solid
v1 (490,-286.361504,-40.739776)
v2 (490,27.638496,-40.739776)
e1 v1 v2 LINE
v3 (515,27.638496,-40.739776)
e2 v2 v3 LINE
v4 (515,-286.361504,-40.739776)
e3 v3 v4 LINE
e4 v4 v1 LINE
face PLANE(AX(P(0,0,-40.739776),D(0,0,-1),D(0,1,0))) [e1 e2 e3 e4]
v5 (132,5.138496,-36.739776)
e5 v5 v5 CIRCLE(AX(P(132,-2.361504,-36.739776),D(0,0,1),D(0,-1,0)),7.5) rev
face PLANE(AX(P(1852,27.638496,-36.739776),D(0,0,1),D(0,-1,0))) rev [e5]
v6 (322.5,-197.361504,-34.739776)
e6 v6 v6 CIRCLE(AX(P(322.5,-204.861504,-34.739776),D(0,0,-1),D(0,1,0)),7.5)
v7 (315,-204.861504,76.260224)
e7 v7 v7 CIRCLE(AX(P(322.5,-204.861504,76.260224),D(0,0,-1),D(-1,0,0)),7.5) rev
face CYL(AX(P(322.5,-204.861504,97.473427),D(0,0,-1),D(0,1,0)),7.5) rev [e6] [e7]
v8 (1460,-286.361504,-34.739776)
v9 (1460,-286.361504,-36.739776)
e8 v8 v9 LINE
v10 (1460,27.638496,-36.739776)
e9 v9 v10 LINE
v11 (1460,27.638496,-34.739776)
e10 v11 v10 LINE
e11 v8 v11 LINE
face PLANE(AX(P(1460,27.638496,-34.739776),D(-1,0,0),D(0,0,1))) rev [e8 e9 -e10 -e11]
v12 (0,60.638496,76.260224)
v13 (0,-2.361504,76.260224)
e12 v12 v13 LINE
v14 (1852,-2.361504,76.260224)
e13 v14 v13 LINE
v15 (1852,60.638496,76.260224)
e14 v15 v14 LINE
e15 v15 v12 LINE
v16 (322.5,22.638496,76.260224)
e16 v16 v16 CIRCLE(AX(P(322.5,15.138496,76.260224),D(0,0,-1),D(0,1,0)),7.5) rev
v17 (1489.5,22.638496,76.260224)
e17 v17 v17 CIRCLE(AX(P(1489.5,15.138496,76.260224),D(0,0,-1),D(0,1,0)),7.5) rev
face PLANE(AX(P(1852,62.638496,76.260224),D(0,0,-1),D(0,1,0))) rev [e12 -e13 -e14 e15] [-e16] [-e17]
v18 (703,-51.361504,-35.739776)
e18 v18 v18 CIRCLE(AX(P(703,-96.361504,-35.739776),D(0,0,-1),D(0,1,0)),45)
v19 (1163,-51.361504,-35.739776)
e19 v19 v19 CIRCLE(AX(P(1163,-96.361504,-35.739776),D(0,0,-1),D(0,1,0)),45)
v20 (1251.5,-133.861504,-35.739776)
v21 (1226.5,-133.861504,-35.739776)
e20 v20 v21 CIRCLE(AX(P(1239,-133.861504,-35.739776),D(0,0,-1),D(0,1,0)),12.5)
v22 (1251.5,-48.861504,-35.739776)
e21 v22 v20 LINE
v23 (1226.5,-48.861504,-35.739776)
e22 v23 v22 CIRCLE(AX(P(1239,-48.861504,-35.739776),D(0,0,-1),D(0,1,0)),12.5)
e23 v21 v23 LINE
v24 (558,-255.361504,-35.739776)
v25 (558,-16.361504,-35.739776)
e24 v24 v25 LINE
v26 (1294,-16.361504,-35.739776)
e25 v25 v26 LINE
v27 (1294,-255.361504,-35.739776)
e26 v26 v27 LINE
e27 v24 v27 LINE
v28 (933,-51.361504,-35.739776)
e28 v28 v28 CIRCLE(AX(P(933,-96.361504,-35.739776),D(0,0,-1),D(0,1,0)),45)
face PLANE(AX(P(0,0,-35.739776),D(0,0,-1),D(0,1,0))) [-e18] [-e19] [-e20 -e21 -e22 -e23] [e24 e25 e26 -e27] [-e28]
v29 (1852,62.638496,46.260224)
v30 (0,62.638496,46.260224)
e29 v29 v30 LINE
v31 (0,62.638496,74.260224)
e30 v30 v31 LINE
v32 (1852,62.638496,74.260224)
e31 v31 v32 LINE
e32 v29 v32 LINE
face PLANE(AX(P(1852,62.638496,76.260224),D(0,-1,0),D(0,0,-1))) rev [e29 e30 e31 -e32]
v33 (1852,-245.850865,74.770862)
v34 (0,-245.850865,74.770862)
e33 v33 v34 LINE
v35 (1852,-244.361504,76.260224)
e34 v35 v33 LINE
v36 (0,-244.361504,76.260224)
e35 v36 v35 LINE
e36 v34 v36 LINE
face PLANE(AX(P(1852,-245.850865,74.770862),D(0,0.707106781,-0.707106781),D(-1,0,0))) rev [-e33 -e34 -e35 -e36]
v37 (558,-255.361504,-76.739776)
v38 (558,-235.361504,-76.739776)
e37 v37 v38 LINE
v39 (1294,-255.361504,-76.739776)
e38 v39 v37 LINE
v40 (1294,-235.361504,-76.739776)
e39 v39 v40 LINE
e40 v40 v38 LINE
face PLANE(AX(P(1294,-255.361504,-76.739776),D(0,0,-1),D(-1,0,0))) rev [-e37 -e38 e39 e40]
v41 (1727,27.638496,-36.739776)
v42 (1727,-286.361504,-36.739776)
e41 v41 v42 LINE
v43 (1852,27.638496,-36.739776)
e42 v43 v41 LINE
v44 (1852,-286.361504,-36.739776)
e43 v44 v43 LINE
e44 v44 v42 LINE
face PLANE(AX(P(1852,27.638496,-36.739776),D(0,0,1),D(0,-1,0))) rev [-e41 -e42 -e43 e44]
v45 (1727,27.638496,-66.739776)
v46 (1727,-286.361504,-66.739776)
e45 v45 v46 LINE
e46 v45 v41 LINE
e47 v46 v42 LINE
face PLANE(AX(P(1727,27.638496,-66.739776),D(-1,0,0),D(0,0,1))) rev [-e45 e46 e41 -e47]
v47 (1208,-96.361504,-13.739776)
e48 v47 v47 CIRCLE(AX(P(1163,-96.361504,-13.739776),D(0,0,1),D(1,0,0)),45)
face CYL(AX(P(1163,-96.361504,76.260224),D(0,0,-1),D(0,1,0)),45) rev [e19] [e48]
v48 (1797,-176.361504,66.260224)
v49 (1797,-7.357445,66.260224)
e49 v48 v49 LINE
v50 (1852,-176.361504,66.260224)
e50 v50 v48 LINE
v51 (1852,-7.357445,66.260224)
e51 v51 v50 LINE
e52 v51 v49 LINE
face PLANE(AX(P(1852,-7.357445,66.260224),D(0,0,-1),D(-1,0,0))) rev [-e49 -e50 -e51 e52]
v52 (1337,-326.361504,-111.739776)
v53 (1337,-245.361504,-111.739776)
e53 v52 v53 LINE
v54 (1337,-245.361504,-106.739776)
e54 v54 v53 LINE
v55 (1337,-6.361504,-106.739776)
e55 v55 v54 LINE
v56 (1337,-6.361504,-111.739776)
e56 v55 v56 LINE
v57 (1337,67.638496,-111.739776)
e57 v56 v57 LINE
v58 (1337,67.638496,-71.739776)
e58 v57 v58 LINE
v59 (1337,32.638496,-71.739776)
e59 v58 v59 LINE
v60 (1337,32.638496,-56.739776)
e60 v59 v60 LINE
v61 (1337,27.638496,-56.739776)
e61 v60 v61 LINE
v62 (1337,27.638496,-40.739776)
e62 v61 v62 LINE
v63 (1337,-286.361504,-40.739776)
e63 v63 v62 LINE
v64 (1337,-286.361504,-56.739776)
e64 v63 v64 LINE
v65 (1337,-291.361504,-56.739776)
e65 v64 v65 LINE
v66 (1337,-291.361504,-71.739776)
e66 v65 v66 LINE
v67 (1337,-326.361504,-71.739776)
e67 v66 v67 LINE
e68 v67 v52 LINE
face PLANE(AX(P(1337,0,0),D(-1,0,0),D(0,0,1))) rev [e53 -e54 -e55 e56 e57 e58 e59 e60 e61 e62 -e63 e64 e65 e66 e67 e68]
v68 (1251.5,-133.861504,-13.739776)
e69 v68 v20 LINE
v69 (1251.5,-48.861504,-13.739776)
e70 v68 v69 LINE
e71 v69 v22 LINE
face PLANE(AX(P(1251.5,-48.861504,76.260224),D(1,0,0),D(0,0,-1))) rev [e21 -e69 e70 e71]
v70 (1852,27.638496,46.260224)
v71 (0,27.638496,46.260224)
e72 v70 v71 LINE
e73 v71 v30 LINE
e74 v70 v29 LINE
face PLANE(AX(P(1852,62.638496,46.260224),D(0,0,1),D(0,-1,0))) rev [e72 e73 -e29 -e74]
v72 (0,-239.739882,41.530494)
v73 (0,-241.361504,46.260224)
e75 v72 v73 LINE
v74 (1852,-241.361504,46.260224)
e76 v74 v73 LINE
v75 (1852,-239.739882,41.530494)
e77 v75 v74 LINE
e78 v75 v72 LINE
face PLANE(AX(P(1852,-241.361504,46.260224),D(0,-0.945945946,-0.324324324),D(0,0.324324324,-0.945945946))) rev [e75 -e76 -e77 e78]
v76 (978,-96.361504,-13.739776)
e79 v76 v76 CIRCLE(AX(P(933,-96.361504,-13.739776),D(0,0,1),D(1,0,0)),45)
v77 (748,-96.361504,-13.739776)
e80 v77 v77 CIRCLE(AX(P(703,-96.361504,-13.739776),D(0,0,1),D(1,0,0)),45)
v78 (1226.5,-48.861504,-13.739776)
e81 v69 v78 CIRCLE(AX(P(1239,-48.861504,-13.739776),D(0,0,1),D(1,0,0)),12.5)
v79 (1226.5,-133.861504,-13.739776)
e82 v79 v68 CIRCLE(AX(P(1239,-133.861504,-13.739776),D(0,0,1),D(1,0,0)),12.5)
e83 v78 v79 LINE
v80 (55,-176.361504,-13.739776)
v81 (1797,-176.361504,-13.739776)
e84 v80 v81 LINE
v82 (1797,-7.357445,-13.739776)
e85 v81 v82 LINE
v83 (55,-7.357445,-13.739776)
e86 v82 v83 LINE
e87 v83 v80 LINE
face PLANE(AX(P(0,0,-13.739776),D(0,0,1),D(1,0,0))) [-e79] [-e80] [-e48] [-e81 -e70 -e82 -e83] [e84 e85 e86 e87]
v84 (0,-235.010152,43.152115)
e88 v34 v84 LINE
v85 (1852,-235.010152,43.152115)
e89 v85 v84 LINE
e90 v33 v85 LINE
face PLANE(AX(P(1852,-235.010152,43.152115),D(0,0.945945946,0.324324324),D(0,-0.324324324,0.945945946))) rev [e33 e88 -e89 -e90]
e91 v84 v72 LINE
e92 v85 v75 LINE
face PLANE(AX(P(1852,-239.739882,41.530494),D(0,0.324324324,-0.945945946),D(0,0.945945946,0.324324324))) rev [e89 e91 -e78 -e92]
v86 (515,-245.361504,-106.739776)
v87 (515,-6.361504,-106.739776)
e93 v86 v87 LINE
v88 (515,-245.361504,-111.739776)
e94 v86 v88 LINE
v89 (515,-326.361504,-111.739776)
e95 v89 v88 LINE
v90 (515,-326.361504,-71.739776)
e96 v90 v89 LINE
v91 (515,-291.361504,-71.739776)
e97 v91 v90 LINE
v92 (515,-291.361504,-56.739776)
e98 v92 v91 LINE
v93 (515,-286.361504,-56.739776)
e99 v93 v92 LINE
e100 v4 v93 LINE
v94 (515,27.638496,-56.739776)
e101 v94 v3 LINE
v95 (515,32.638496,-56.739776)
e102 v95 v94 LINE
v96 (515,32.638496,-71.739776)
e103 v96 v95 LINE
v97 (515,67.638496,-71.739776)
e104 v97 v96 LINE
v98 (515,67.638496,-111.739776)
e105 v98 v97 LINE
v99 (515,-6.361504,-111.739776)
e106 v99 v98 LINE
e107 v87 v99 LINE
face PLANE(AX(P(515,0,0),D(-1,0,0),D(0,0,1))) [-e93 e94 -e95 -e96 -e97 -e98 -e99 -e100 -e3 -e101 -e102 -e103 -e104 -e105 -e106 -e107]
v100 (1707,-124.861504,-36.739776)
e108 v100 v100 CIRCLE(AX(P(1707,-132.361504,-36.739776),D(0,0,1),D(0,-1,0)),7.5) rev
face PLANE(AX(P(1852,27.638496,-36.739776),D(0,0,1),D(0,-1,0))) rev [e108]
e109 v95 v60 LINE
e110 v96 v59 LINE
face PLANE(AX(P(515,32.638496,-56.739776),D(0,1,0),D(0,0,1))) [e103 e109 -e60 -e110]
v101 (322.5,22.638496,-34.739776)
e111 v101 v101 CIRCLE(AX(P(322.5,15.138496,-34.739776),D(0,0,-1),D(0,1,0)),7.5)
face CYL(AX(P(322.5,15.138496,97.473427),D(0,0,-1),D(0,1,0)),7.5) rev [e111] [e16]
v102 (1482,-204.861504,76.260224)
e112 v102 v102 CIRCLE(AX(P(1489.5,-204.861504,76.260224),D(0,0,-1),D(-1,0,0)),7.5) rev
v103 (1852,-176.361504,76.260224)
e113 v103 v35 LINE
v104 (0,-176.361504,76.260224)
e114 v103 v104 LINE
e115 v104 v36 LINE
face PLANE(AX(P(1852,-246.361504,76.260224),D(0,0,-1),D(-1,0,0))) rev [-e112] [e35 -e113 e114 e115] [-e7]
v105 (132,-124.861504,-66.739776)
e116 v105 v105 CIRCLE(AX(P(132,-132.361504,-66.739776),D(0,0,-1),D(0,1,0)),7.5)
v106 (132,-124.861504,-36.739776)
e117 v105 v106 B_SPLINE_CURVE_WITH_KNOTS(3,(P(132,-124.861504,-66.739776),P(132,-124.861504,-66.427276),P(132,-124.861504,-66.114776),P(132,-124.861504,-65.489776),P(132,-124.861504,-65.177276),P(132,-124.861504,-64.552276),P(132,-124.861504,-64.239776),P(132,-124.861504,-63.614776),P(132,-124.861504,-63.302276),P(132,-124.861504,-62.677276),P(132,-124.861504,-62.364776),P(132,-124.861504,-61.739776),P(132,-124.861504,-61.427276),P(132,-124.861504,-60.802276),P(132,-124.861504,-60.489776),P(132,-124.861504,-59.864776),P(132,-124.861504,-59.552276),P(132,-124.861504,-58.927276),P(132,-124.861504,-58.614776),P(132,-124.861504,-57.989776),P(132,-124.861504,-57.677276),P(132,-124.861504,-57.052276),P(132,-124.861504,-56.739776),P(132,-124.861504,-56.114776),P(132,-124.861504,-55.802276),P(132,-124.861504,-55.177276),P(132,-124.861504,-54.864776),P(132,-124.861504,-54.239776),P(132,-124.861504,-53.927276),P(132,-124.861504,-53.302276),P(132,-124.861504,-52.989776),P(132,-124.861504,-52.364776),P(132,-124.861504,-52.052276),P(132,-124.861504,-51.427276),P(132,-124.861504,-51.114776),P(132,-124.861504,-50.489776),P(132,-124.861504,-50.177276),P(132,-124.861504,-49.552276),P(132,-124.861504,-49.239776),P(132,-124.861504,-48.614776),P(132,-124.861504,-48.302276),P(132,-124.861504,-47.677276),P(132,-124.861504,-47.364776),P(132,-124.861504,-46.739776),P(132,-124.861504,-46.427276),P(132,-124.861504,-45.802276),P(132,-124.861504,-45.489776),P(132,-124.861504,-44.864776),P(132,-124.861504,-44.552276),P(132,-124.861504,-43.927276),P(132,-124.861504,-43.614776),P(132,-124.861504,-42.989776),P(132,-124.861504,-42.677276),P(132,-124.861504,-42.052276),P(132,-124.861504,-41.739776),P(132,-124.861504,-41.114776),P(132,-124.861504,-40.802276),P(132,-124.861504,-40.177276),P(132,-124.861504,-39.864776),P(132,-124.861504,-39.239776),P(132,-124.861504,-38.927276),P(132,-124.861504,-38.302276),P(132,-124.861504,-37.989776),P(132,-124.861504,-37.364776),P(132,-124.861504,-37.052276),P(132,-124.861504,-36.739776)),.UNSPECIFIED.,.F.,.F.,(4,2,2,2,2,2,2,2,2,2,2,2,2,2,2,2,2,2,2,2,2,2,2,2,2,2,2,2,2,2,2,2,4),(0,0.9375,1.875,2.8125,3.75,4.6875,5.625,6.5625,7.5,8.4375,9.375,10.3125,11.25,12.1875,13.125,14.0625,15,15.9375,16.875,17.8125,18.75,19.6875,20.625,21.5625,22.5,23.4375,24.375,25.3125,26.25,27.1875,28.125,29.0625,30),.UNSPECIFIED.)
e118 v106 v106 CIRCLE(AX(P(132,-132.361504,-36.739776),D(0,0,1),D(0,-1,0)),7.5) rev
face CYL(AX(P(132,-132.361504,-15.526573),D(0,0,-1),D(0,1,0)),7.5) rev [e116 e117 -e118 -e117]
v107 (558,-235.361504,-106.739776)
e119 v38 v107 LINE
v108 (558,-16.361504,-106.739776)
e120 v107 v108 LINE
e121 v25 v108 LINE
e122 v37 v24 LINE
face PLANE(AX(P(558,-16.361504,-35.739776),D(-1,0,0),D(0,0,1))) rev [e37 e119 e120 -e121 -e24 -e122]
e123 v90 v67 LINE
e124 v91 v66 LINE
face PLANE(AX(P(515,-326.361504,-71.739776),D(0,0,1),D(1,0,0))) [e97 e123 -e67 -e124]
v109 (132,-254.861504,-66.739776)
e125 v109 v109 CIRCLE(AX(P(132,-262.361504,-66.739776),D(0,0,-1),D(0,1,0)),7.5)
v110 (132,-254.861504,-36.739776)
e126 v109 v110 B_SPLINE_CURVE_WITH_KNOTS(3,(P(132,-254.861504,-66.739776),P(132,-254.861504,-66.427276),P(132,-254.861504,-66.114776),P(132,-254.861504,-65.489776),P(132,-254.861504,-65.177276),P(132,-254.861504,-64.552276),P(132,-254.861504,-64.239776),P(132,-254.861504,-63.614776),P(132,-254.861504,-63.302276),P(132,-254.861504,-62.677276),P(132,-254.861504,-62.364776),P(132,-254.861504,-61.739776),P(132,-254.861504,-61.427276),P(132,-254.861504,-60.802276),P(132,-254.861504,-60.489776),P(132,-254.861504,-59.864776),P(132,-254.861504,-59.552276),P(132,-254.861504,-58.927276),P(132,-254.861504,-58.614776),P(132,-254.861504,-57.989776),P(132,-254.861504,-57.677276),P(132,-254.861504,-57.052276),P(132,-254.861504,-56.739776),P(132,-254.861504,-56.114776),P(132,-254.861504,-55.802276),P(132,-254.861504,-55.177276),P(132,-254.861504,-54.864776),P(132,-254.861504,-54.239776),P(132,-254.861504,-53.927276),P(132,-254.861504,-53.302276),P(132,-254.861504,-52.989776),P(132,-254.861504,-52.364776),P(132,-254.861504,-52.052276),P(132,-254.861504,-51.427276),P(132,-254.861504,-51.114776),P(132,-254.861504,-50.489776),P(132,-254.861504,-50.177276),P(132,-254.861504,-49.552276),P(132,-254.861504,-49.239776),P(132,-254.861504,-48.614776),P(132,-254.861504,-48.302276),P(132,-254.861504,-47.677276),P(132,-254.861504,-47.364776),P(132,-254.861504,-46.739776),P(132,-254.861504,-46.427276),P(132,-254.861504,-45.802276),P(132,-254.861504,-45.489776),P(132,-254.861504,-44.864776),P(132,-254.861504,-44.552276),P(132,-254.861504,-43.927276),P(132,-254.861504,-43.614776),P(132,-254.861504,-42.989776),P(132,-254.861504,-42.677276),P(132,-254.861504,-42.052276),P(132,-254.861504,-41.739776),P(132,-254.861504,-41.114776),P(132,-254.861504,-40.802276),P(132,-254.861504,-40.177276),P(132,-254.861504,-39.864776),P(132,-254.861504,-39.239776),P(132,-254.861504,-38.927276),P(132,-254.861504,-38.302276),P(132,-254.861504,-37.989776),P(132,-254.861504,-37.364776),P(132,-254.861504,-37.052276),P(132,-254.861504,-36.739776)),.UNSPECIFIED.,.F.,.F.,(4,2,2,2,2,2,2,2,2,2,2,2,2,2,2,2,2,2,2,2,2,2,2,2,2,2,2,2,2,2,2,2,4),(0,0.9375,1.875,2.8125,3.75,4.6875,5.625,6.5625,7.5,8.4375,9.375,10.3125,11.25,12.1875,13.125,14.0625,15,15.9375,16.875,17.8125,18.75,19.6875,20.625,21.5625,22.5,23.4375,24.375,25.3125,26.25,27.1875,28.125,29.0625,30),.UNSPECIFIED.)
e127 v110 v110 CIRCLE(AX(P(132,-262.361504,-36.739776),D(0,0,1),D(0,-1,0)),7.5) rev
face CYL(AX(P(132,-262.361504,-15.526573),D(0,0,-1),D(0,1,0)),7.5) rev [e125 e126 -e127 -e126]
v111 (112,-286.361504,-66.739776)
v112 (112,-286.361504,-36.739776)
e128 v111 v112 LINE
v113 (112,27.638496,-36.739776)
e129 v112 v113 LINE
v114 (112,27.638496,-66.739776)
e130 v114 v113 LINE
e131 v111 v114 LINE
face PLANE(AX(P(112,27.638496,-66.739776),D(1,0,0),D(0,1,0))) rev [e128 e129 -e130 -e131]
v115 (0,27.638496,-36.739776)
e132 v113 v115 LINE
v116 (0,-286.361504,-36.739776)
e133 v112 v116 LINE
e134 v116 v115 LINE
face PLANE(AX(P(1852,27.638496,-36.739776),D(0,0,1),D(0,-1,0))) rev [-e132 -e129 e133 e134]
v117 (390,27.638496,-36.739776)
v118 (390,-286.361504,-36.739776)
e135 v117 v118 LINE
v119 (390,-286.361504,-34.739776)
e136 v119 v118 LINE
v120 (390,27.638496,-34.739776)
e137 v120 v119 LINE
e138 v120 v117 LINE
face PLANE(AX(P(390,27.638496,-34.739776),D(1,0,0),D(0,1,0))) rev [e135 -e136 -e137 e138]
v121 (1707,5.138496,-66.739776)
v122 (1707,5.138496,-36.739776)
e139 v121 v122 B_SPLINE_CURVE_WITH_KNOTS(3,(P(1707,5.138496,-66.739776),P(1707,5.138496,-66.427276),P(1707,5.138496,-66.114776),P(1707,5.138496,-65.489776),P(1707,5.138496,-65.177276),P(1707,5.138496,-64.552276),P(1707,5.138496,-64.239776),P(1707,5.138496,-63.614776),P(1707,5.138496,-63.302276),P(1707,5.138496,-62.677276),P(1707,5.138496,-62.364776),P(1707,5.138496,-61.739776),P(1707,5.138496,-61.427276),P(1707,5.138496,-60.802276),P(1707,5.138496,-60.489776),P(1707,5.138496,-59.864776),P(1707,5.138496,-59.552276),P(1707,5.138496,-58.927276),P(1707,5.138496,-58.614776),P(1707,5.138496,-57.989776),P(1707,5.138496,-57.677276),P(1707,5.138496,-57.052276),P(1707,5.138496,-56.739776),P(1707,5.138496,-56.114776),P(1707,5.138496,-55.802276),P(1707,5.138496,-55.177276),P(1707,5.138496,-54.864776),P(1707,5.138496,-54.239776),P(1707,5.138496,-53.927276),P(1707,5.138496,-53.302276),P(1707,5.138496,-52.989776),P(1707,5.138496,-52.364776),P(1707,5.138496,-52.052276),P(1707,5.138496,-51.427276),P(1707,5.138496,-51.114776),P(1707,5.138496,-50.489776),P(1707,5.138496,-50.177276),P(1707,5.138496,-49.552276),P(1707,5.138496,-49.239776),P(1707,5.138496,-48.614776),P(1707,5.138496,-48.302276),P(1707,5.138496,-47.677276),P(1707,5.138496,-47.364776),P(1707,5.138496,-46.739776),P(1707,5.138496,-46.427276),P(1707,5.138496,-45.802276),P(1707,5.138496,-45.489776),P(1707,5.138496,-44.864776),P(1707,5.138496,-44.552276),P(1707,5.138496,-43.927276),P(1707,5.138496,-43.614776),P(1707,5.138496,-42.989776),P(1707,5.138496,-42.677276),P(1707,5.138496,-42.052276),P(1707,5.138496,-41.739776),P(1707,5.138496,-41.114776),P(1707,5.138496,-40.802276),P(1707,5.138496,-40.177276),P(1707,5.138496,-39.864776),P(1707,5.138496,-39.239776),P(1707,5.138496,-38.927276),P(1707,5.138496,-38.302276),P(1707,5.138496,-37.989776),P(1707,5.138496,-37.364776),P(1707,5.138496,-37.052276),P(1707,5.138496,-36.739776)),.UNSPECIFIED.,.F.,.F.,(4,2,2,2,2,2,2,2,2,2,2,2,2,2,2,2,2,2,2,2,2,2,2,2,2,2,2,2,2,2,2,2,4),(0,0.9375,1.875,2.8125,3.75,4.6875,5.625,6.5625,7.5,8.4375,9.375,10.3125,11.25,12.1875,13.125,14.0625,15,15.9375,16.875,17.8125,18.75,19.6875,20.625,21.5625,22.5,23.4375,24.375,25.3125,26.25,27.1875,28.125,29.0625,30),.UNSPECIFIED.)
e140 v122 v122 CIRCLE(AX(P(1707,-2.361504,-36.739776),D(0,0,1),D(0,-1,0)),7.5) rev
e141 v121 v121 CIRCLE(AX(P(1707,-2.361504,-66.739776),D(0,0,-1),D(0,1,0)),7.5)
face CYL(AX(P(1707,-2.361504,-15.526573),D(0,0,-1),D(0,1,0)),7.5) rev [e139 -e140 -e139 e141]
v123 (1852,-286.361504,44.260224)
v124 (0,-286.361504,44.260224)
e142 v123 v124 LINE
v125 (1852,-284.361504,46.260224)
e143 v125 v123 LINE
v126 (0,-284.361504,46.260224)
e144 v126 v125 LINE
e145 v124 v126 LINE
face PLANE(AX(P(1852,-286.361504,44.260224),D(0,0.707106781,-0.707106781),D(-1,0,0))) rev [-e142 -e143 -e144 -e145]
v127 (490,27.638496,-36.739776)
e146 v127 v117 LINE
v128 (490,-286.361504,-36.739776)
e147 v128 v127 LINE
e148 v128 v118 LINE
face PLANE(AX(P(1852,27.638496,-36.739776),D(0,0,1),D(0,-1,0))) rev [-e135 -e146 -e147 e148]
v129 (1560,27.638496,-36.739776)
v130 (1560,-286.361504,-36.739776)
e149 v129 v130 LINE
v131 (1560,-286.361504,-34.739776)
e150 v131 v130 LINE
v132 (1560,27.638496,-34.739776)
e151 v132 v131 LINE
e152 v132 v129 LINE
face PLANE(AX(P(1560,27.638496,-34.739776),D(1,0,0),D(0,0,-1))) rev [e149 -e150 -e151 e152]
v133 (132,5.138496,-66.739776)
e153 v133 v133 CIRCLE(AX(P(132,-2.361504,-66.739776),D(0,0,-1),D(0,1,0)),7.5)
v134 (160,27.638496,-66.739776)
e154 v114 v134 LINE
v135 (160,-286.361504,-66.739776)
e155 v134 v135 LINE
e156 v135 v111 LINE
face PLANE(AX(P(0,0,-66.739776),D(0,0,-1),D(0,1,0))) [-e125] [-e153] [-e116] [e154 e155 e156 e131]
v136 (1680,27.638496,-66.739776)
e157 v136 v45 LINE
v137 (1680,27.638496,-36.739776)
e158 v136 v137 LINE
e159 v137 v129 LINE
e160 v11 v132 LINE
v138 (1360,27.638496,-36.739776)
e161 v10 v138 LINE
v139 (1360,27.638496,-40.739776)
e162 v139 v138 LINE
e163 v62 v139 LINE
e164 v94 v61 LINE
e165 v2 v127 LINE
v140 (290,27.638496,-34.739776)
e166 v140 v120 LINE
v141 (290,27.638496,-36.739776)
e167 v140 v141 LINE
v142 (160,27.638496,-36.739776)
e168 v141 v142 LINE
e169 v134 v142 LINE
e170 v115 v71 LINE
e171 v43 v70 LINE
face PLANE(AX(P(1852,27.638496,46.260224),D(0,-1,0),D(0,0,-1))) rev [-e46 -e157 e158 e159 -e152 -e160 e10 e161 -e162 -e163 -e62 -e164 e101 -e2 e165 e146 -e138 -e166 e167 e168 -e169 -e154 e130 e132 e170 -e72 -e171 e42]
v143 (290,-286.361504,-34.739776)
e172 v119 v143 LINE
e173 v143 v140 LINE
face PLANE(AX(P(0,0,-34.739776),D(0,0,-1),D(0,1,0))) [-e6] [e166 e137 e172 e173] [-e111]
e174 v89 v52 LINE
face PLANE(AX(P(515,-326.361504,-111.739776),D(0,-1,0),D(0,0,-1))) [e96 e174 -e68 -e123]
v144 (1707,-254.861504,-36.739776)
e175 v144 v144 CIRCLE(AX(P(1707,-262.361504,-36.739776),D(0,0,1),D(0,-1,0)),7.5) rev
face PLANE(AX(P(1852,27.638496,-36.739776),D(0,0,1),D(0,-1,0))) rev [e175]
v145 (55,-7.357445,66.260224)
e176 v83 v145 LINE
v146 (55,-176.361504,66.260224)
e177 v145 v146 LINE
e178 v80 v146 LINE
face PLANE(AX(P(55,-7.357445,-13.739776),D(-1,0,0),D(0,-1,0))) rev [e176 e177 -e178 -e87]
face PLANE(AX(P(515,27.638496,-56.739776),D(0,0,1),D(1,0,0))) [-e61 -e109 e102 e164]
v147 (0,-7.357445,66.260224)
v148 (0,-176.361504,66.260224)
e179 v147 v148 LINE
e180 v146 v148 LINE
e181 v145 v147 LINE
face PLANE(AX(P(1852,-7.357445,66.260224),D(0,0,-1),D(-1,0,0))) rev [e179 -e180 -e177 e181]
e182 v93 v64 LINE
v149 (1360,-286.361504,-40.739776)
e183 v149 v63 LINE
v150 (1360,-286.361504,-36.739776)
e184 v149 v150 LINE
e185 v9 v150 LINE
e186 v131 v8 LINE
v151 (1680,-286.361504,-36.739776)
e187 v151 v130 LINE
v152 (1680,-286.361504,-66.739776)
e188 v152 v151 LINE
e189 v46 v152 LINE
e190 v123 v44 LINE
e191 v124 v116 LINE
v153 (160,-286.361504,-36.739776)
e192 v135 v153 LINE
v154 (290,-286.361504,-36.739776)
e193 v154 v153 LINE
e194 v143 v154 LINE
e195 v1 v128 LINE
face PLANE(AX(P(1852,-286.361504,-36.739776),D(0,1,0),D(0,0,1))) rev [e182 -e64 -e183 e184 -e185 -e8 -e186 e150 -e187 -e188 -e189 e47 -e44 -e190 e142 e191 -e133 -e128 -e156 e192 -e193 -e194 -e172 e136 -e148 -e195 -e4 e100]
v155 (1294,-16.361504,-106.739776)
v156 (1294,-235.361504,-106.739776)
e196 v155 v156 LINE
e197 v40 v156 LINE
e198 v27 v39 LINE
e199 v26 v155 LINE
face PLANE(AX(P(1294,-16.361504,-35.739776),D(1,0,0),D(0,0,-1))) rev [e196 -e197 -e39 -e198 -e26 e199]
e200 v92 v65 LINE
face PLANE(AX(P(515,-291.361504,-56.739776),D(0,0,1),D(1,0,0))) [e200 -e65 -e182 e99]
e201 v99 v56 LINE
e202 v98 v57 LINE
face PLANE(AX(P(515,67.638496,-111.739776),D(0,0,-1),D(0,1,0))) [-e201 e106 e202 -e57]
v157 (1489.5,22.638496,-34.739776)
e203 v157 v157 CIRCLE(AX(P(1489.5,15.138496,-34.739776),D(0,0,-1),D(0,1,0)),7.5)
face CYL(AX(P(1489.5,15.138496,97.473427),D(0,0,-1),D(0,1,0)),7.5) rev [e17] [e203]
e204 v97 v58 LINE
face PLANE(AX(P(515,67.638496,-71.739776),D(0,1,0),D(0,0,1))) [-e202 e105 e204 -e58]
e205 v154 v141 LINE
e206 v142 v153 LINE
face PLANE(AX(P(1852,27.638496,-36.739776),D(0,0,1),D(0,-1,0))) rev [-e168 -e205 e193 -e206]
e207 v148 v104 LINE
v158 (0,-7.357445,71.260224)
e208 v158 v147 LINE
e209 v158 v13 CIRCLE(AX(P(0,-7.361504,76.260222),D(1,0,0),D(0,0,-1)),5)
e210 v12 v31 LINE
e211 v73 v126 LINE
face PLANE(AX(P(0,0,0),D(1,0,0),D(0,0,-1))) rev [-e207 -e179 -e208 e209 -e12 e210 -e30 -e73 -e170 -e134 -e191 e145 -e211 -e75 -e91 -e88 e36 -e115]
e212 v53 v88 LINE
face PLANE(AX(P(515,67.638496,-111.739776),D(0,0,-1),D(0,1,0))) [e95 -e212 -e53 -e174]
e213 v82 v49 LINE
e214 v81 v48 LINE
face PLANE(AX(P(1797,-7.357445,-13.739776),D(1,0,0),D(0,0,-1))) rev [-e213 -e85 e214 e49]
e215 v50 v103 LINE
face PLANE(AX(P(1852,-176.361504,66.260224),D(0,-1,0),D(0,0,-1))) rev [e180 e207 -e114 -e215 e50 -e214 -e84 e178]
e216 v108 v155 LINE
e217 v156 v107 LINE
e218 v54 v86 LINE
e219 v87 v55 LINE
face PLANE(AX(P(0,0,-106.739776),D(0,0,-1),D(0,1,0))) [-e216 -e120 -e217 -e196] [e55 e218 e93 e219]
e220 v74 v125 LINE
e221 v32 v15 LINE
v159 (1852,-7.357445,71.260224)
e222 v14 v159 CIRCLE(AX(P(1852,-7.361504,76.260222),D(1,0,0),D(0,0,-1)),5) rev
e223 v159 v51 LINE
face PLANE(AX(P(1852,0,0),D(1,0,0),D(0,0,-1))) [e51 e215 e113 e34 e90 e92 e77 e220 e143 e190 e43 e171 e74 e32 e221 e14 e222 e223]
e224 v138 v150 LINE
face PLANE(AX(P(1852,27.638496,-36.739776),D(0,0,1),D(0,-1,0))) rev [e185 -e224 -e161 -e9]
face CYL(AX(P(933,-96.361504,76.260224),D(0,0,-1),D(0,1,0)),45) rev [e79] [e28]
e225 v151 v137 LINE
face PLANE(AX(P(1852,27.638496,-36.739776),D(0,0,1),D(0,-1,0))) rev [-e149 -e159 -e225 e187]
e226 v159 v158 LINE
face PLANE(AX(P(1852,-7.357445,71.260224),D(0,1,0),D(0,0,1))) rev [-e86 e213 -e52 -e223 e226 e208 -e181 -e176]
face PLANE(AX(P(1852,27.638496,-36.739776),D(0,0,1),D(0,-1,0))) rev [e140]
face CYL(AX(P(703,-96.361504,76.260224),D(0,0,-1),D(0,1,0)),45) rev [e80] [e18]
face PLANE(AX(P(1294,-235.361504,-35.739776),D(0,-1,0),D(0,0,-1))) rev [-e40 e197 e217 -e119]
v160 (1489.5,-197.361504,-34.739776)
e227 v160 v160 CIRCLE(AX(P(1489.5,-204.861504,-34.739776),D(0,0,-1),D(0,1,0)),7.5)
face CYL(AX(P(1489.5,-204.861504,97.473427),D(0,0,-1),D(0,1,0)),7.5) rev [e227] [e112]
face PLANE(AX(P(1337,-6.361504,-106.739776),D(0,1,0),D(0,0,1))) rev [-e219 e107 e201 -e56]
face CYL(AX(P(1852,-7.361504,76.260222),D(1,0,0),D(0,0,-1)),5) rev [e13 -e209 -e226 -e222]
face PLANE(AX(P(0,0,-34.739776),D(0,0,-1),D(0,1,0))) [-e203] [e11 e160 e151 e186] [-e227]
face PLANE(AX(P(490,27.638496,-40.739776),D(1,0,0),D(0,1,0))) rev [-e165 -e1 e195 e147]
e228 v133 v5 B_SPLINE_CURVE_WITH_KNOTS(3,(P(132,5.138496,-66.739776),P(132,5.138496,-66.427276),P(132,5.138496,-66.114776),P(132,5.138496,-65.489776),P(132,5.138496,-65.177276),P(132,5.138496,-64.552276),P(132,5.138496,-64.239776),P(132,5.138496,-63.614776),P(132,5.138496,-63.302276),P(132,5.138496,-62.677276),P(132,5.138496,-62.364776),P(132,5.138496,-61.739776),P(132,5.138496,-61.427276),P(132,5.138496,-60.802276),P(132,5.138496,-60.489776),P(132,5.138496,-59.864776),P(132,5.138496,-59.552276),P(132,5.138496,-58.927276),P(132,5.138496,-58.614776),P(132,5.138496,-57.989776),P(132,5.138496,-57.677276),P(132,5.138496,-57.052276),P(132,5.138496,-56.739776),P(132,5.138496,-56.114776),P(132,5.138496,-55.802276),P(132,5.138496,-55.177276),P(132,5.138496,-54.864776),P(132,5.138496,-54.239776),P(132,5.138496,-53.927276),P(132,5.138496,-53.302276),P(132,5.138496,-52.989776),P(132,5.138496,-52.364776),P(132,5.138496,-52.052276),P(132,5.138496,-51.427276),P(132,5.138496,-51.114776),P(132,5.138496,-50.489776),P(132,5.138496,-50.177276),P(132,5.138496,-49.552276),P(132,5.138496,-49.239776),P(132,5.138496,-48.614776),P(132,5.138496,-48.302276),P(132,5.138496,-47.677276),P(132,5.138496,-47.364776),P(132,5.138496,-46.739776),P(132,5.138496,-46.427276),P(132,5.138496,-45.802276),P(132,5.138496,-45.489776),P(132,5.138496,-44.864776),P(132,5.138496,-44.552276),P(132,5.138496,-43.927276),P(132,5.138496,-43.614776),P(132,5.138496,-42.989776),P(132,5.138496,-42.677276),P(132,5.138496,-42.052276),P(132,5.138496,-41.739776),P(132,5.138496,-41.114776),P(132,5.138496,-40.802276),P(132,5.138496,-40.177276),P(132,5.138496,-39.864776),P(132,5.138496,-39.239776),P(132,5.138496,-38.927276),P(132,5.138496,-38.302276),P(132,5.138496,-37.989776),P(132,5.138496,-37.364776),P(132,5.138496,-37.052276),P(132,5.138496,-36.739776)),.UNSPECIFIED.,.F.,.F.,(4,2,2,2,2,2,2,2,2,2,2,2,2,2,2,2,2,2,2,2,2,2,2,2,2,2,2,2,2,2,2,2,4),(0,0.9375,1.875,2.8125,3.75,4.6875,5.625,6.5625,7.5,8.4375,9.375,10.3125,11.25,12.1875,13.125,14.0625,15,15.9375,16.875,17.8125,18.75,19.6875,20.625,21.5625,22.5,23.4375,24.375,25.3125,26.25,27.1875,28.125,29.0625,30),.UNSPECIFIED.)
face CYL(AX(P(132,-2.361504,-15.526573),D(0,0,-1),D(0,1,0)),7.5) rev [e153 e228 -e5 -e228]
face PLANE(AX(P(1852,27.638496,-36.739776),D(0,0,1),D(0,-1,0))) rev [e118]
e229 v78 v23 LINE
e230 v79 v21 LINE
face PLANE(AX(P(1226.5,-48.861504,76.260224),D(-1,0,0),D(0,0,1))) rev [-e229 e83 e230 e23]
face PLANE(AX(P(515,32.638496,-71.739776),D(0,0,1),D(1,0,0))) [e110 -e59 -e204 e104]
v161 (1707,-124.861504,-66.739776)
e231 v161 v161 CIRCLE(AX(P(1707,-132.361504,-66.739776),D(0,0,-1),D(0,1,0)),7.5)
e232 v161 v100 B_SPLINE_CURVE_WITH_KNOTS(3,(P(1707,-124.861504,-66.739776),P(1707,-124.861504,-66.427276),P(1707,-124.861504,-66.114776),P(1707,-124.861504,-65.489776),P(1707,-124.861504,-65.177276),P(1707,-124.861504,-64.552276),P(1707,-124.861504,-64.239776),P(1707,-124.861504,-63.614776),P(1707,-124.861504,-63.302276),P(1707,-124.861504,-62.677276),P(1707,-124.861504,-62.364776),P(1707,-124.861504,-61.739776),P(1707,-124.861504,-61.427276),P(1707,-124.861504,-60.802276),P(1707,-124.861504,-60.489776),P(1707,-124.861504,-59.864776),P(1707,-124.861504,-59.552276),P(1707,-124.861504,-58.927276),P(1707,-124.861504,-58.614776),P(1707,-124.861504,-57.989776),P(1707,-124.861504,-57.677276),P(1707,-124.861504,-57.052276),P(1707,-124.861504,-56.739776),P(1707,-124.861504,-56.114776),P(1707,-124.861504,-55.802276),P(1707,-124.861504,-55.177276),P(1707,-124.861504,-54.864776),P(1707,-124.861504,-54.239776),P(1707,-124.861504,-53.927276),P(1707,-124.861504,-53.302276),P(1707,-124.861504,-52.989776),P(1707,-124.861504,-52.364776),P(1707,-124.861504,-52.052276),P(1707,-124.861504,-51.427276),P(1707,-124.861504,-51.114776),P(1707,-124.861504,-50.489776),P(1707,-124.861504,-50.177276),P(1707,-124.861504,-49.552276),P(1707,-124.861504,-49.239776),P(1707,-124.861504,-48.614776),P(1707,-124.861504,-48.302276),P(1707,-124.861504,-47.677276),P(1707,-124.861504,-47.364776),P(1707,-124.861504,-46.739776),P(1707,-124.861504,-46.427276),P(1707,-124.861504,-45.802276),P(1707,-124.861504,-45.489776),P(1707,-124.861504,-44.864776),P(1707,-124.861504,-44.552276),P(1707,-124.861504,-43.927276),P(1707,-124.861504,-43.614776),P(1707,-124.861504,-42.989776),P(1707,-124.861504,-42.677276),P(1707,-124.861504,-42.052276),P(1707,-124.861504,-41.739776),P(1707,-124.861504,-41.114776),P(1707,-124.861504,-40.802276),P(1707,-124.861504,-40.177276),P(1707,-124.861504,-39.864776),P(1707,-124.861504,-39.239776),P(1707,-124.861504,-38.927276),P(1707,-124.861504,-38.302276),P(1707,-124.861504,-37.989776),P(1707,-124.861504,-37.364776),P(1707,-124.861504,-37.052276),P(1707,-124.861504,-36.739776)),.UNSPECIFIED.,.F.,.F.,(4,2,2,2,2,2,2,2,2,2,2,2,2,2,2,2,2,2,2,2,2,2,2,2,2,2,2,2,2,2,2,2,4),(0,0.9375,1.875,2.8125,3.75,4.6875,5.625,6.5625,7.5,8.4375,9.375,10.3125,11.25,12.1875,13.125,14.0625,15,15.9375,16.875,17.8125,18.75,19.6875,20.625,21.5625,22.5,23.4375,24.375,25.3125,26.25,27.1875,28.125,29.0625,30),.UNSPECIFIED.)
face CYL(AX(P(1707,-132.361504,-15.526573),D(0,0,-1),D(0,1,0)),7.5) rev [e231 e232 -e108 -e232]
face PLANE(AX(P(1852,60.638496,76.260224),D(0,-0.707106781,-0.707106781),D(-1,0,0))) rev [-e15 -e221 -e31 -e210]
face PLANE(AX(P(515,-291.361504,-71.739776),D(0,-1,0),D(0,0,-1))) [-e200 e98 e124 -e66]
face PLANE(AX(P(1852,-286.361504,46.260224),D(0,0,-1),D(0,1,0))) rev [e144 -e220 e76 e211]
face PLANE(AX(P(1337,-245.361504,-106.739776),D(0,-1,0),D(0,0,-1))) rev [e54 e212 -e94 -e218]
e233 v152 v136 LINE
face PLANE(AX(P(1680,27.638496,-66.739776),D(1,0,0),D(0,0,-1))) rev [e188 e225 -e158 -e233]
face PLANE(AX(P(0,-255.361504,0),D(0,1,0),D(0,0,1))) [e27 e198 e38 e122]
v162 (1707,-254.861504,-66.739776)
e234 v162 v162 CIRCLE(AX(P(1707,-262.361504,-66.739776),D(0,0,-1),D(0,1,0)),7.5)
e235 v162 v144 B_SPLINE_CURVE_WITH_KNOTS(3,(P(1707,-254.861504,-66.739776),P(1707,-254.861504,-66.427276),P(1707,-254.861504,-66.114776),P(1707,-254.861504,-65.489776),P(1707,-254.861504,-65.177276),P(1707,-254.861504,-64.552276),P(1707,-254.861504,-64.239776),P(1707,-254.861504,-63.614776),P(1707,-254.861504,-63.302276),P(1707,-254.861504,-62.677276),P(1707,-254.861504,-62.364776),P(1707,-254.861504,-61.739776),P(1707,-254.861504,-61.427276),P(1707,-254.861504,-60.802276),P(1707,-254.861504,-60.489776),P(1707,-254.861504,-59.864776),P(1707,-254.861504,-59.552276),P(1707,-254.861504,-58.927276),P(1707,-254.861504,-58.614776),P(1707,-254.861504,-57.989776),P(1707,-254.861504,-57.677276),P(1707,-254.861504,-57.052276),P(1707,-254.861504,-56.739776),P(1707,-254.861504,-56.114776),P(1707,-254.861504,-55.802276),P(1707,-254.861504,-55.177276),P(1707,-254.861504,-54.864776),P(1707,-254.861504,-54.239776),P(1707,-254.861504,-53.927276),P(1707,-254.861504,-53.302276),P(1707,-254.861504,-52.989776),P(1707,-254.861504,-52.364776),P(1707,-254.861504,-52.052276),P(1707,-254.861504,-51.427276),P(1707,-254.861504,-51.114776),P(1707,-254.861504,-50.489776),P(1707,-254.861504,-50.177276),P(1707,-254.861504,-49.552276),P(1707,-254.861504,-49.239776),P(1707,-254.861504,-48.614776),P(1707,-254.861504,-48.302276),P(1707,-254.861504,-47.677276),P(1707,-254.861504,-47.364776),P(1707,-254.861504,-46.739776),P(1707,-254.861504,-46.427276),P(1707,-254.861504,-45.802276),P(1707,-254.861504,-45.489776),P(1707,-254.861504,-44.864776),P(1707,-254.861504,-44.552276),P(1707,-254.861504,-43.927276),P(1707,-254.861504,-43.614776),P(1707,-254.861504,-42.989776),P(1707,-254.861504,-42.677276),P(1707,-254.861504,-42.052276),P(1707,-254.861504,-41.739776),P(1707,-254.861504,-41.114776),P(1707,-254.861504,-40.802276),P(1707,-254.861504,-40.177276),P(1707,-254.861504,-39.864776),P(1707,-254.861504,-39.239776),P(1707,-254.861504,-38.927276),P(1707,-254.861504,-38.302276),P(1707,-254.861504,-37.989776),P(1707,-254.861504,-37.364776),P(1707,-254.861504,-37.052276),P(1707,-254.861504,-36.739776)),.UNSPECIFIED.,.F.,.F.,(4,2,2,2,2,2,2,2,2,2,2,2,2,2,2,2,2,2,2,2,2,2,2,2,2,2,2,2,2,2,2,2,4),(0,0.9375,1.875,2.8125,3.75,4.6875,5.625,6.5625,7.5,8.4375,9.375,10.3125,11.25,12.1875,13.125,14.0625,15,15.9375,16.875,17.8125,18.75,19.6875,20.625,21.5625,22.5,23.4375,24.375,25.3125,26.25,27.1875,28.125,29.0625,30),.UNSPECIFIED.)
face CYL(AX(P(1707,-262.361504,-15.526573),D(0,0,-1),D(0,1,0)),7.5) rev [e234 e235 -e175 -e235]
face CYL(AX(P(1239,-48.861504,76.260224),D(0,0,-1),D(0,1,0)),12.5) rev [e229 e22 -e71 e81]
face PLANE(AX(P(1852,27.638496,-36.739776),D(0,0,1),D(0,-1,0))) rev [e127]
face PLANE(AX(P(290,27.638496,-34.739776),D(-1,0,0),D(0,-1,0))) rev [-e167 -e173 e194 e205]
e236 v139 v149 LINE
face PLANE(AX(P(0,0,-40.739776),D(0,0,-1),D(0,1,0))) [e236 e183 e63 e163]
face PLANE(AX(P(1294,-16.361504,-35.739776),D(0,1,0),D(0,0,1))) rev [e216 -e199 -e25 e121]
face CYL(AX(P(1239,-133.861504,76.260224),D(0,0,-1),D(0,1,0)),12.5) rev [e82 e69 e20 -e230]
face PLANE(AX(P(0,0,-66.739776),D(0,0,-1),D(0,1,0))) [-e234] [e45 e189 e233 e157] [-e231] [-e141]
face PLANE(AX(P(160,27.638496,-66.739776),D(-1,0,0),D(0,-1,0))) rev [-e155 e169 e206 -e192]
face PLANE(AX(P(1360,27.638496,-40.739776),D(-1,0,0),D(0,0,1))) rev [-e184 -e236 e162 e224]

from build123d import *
from OCP.BRepFilletAPI import BRepFilletAPI_MakeChamfer

# Parameters (mm, degrees)
EXTRUDE_1_DEPTH      = 1852
FILLET_1_R           = 5
CHAMFER_1_SIZE       = 2
CHAMFER_1_SIZE2      = 1.574468085
EXTRUDE_2_DEPTH      = 822
SKETCH_5_W           = 47
SKETCH_5_H           = 314
EXTRUDE_3_DEPTH      = 30
SKETCH_7_W           = 100
SKETCH_7_H           = 314
CUT_EXTRUDE_1_DEPTH  = 2
SKETCH_8_W           = 23
SKETCH_8_H           = 314
EXTRUDE_4_DEPTH      = 4
SKETCH_9_W           = 48
SKETCH_9_H           = 314
EXTRUDE_5_DEPTH      = 30
SKETCH_10_W          = 100
SKETCH_10_H          = 314
CUT_EXTRUDE_2_DEPTH  = 2
SKETCH_11_W          = 25
SKETCH_11_H          = 314
EXTRUDE_6_DEPTH      = 4
SKETCH_12_W          = 1742
SKETCH_12_H          = 169.004058013
CUT_EXTRUDE_3_DEPTH  = 80
SKETCH_13_W          = 822
SKETCH_13_H          = 239
CUT_EXTRUDE_4_DEPTH  = 5
SKETCH_14_W          = 736
SKETCH_14_H          = 219
CUT_EXTRUDE_5_DEPTH  = 71
SKETCH_15_R          = 45
CUT_EXTRUDE_6_DEPTH  = 1884.868315719
SKETCH_16_W          = 736
SKETCH_16_H          = 41
CUT_EXTRUDE_7_DEPTH  = 20
SKETCH_17_R          = 7.5
CUT_EXTRUDE_8_DEPTH  = 30
SKETCH_18_R          = 7.5
CUT_EXTRUDE_9_DEPTH  = 113
SKETCH_21_R          = 7.5
CUT_EXTRUDE_11_DEPTH = 111
SKETCH_23_R          = 7.5
CUT_EXTRUDE_12_DEPTH = 111


with BuildPart() as part:
    # 草图2 → 凸台-拉伸1 (new body)
    with BuildSketch(Plane(origin=(0, 0, 0), x_dir=(0, 0, -1), z_dir=(1, 0, 0))):
        Polygon((-76.260223553, 62.638496495), (-46.260223553, 62.638496495), (-46.260223553, 27.638496495), (36.739776447, 27.638496495), (36.739776447, -286.361503505), (-46.260223553, -286.361503505), (-46.260223553, -241.361503505), (-41.530493824, -239.739881883), (-43.152115445, -235.010152153), (-76.260223553, -246.361503505), (-76.260223553, -176.361503505), (-66.260223553, -176.361503505), (-66.260223553, -7.357445492), (-71.260223553, -7.357445492), (-71.260223553, -2.361503505), (-76.260223553, -2.361503505), align=None)
    extrude(amount=EXTRUDE_1_DEPTH)

    # 圆角1
    # the kernel refuses this fillet: 5 mm, written as the material it adds along each edge
    with BuildSketch(Plane(origin=(0, -2.361503505, 71.260223553), x_dir=(0, -1, 0), z_dir=(1, 0, 0))) as fillet_1_piece_1_section:
        with BuildLine():
            CenterArc((FILLET_1_R, -FILLET_1_R), FILLET_1_R, 90, 90)
            Line((0, -FILLET_1_R), (0, 0))
            Line((0, 0), (FILLET_1_R, 0))
        make_face()
    fillet_1_piece_1 = extrude(amount=1852, mode=Mode.PRIVATE)
    fillet_1_piece_1 = split(fillet_1_piece_1, bisect_by=Plane(origin=(926, -7.357445492, 72.392274368), z_dir=(0, 1, 0)), keep=Keep.TOP, mode=Mode.PRIVATE)
    add(fillet_1_piece_1)

    # 倒角1: one chamfer whose edges measure the first distance from different faces: ONE call of the kernel's chamfer builder (chamfer() names one face for all edges)
    chamfer_1_edges_1 = [part.edges().sort_by_distance(p)[0] for p in [
        (926, 62.638496495, 76.260223553),
        (926, -286.361503505, 46.260223553),
    ]]
    chamfer_1_edges_2 = [part.edges().sort_by_distance(p)[0] for p in [
        (926, -246.361503505, 76.260223553),
    ]]
    chamfer_1_side_2 = [part.faces().sort_by_distance(p)[0] for p in [
        (926, -211.361503505, 76.260223553),
    ]]
    chamfer_1 = BRepFilletAPI_MakeChamfer(part.part.solid().wrapped)
    for e in chamfer_1_edges_1:
        chamfer_1.Add(CHAMFER_1_SIZE, e.wrapped)
    for e in chamfer_1_edges_2:
        chamfer_1.Add(CHAMFER_1_SIZE, CHAMFER_1_SIZE2, e.wrapped, chamfer_1_side_2[0].wrapped)  # the first distance lies on this face
    add(Compound.cast(chamfer_1.Shape()), mode=Mode.REPLACE)

    # 草图4 → 凸台-拉伸2 (add)
    with BuildSketch(Plane(origin=(1337, 0, 0), x_dir=(0, 0, -1), z_dir=(1, 0, 0))):
        Polygon((36.739776447, 27.638496495), (56.739776447, 27.638496495), (56.739776447, 32.638496495), (71.739776447, 32.638496495), (71.739776447, 67.638496495), (111.739776447, 67.638496495), (111.739776447, -326.361503505), (71.739776447, -326.361503505), (71.739776447, -291.361503505), (56.739776447, -291.361503505), (56.739776447, -286.361503505), (36.739776447, -286.361503505), align=None)
    extrude(amount=-EXTRUDE_2_DEPTH)

    # 草图5 → 凸台-拉伸3 (add)
    with BuildSketch(Plane(origin=(0, 0, -36.739776447), x_dir=(-1, 0, 0), z_dir=(0, 0, -1))):
        with Locations((-1703.5, -129.361503505)):
            Rectangle(SKETCH_5_W, SKETCH_5_H)
    extrude(amount=EXTRUDE_3_DEPTH)

    # 草图7 → 切除-拉伸1 (cut)
    with BuildSketch(Plane(origin=(0, 0, -36.739776447), x_dir=(-1, 0, 0), z_dir=(0, 0, -1))):
        with Locations((-1510, -129.361503505)):
            Rectangle(SKETCH_7_W, SKETCH_7_H)
    extrude(amount=-CUT_EXTRUDE_1_DEPTH, mode=Mode.SUBTRACT)

    # 草图8 → 凸台-拉伸4 (add)
    with BuildSketch(Plane(origin=(0, 0, -36.739776447), x_dir=(-1, 0, 0), z_dir=(0, 0, -1))):
        with Locations((-1348.5, -129.361503505)):
            Rectangle(SKETCH_8_W, SKETCH_8_H)
    extrude(amount=EXTRUDE_4_DEPTH)

    # 草图9 → 凸台-拉伸5 (add)
    with BuildSketch(Plane(origin=(0, 0, -36.739776447), x_dir=(-1, 0, 0), z_dir=(0, 0, -1))):
        with Locations((-136, -129.361503505)):
            Rectangle(SKETCH_9_W, SKETCH_9_H)
    extrude(amount=EXTRUDE_5_DEPTH)

    # 草图10 → 切除-拉伸2 (cut)
    with BuildSketch(Plane(origin=(0, 0, -36.739776447), x_dir=(-1, 0, 0), z_dir=(0, 0, -1))):
        with Locations((-340, -129.361503505)):
            Rectangle(SKETCH_10_W, SKETCH_10_H)
    extrude(amount=-CUT_EXTRUDE_2_DEPTH, mode=Mode.SUBTRACT)

    # 草图11 → 凸台-拉伸6 (add)
    with BuildSketch(Plane(origin=(0, 0, -36.739776447), x_dir=(-1, 0, 0), z_dir=(0, 0, -1))):
        with Locations((-502.5, -129.361503505)):
            Rectangle(SKETCH_11_W, SKETCH_11_H)
    extrude(amount=EXTRUDE_6_DEPTH)

    # 草图12 → 切除-拉伸3 (cut)
    with BuildSketch(Plane.XY.offset(66.260223553)):
        with Locations((926, -91.859474499)):
            Rectangle(SKETCH_12_W, SKETCH_12_H)
    extrude(amount=-CUT_EXTRUDE_3_DEPTH, mode=Mode.SUBTRACT)

    # 草图13 → 切除-拉伸4 (cut)
    with BuildSketch(Plane(origin=(0, 0, -111.739776447), x_dir=(-1, 0, 0), z_dir=(0, 0, -1))):
        with Locations((-926, -125.861503505)):
            Rectangle(SKETCH_13_W, SKETCH_13_H)
    extrude(amount=-CUT_EXTRUDE_4_DEPTH, mode=Mode.SUBTRACT)

    # 草图14 → 切除-拉伸5 (cut)
    with BuildSketch(Plane(origin=(0, 0, -106.739776447), x_dir=(-1, 0, 0), z_dir=(0, 0, -1))):
        with Locations((-926, -125.861503505)):
            Rectangle(SKETCH_14_W, SKETCH_14_H)
    extrude(amount=-CUT_EXTRUDE_5_DEPTH, mode=Mode.SUBTRACT)

    # 草图15 → 切除-拉伸6 (cut, through all)
    with BuildSketch(Plane(origin=(0, 0, -35.739776447), x_dir=(-1, 0, 0), z_dir=(0, 0, -1))):
        with Locations(Location((-1163, -96.361503505, 0), (0, 0, 90))):
            Circle(SKETCH_15_R)
        with Locations(Location((-933, -96.361503505, 0), (0, 0, 90))):
            Circle(SKETCH_15_R)
        with Locations(Location((-703, -96.361503505, 0), (0, 0, 90))):
            Circle(SKETCH_15_R)
        with BuildLine():
            Line((-1226.5, -48.861503505), (-1226.5, -133.861503505))
            ThreePointArc((-1226.5, -133.861503505), (-1239, -146.361503505), (-1251.5, -133.861503505))
            Line((-1251.5, -133.861503505), (-1251.5, -48.861503505))
            ThreePointArc((-1251.5, -48.861503505), (-1239, -36.361503505), (-1226.5, -48.861503505))
        make_face()
    extrude(amount=-CUT_EXTRUDE_6_DEPTH, mode=Mode.SUBTRACT)

    # 草图16 → 切除-拉伸7 (cut)
    with BuildSketch(Plane(origin=(0, -235.361503505, 0), x_dir=(1, 0, 0), z_dir=(0, 1, 0))):
        with Locations((926, 56.239776447)):
            Rectangle(SKETCH_16_W, SKETCH_16_H)
    extrude(amount=-CUT_EXTRUDE_7_DEPTH, mode=Mode.SUBTRACT)

    # 草图17 → 切除-拉伸8 (cut)
    with BuildSketch(Plane(origin=(0, 0, -66.739776447), x_dir=(-1, 0, 0), z_dir=(0, 0, -1))):
        with Locations(Location((-1707, -2.361503505, 0), (0, 0, 90))):
            Circle(SKETCH_17_R)
        with Locations(Location((-1707, -132.361503505, 0), (0, 0, 90))):
            Circle(SKETCH_17_R)
        with Locations(Location((-1707, -262.361503505, 0), (0, 0, 90))):
            Circle(SKETCH_17_R)
        with Locations(Location((-132, -2.361503505, 0), (0, 0, 90))):
            Circle(SKETCH_17_R)
        with Locations(Location((-132, -132.361503505, 0), (0, 0, 90))):
            Circle(SKETCH_17_R)
        with Locations(Location((-132, -262.361503505, 0), (0, 0, 90))):
            Circle(SKETCH_17_R)
    extrude(amount=-CUT_EXTRUDE_8_DEPTH, mode=Mode.SUBTRACT)

    # 草图18 → 切除-拉伸9 (cut)
    with BuildSketch(Plane(origin=(0, 0, -36.739776447), x_dir=(-1, 0, 0), z_dir=(0, 0, -1))):
        with Locations(Location((-1489.500000001, 15.138496495, 0), (0, 0, 90))):
            Circle(SKETCH_18_R)
    extrude(amount=-CUT_EXTRUDE_9_DEPTH, mode=Mode.SUBTRACT)

    # 草图21 → 切除-拉伸11 (cut)
    with BuildSketch(Plane(origin=(0, 0, -34.739776447), x_dir=(-1, 0, 0), z_dir=(0, 0, -1))):
        with Locations(Location((-322.5, 15.138496495, 0), (0, 0, 90))):
            Circle(SKETCH_21_R)
    extrude(amount=-CUT_EXTRUDE_11_DEPTH, mode=Mode.SUBTRACT)

    # 草图23 → 切除-拉伸12 (cut)
    with BuildSketch(Plane(origin=(0, 0, -34.739776447), x_dir=(-1, 0, 0), z_dir=(0, 0, -1))):
        with Locations(Location((-1489.500000001, -204.861503505, 0), (0, 0, 90))):
            Circle(SKETCH_23_R)
        with Locations(Location((-322.5, -204.861503505, 0), (0, 0, 90))):
            Circle(SKETCH_23_R)
    extrude(amount=-CUT_EXTRUDE_12_DEPTH, mode=Mode.SUBTRACT)


solid = part.part
